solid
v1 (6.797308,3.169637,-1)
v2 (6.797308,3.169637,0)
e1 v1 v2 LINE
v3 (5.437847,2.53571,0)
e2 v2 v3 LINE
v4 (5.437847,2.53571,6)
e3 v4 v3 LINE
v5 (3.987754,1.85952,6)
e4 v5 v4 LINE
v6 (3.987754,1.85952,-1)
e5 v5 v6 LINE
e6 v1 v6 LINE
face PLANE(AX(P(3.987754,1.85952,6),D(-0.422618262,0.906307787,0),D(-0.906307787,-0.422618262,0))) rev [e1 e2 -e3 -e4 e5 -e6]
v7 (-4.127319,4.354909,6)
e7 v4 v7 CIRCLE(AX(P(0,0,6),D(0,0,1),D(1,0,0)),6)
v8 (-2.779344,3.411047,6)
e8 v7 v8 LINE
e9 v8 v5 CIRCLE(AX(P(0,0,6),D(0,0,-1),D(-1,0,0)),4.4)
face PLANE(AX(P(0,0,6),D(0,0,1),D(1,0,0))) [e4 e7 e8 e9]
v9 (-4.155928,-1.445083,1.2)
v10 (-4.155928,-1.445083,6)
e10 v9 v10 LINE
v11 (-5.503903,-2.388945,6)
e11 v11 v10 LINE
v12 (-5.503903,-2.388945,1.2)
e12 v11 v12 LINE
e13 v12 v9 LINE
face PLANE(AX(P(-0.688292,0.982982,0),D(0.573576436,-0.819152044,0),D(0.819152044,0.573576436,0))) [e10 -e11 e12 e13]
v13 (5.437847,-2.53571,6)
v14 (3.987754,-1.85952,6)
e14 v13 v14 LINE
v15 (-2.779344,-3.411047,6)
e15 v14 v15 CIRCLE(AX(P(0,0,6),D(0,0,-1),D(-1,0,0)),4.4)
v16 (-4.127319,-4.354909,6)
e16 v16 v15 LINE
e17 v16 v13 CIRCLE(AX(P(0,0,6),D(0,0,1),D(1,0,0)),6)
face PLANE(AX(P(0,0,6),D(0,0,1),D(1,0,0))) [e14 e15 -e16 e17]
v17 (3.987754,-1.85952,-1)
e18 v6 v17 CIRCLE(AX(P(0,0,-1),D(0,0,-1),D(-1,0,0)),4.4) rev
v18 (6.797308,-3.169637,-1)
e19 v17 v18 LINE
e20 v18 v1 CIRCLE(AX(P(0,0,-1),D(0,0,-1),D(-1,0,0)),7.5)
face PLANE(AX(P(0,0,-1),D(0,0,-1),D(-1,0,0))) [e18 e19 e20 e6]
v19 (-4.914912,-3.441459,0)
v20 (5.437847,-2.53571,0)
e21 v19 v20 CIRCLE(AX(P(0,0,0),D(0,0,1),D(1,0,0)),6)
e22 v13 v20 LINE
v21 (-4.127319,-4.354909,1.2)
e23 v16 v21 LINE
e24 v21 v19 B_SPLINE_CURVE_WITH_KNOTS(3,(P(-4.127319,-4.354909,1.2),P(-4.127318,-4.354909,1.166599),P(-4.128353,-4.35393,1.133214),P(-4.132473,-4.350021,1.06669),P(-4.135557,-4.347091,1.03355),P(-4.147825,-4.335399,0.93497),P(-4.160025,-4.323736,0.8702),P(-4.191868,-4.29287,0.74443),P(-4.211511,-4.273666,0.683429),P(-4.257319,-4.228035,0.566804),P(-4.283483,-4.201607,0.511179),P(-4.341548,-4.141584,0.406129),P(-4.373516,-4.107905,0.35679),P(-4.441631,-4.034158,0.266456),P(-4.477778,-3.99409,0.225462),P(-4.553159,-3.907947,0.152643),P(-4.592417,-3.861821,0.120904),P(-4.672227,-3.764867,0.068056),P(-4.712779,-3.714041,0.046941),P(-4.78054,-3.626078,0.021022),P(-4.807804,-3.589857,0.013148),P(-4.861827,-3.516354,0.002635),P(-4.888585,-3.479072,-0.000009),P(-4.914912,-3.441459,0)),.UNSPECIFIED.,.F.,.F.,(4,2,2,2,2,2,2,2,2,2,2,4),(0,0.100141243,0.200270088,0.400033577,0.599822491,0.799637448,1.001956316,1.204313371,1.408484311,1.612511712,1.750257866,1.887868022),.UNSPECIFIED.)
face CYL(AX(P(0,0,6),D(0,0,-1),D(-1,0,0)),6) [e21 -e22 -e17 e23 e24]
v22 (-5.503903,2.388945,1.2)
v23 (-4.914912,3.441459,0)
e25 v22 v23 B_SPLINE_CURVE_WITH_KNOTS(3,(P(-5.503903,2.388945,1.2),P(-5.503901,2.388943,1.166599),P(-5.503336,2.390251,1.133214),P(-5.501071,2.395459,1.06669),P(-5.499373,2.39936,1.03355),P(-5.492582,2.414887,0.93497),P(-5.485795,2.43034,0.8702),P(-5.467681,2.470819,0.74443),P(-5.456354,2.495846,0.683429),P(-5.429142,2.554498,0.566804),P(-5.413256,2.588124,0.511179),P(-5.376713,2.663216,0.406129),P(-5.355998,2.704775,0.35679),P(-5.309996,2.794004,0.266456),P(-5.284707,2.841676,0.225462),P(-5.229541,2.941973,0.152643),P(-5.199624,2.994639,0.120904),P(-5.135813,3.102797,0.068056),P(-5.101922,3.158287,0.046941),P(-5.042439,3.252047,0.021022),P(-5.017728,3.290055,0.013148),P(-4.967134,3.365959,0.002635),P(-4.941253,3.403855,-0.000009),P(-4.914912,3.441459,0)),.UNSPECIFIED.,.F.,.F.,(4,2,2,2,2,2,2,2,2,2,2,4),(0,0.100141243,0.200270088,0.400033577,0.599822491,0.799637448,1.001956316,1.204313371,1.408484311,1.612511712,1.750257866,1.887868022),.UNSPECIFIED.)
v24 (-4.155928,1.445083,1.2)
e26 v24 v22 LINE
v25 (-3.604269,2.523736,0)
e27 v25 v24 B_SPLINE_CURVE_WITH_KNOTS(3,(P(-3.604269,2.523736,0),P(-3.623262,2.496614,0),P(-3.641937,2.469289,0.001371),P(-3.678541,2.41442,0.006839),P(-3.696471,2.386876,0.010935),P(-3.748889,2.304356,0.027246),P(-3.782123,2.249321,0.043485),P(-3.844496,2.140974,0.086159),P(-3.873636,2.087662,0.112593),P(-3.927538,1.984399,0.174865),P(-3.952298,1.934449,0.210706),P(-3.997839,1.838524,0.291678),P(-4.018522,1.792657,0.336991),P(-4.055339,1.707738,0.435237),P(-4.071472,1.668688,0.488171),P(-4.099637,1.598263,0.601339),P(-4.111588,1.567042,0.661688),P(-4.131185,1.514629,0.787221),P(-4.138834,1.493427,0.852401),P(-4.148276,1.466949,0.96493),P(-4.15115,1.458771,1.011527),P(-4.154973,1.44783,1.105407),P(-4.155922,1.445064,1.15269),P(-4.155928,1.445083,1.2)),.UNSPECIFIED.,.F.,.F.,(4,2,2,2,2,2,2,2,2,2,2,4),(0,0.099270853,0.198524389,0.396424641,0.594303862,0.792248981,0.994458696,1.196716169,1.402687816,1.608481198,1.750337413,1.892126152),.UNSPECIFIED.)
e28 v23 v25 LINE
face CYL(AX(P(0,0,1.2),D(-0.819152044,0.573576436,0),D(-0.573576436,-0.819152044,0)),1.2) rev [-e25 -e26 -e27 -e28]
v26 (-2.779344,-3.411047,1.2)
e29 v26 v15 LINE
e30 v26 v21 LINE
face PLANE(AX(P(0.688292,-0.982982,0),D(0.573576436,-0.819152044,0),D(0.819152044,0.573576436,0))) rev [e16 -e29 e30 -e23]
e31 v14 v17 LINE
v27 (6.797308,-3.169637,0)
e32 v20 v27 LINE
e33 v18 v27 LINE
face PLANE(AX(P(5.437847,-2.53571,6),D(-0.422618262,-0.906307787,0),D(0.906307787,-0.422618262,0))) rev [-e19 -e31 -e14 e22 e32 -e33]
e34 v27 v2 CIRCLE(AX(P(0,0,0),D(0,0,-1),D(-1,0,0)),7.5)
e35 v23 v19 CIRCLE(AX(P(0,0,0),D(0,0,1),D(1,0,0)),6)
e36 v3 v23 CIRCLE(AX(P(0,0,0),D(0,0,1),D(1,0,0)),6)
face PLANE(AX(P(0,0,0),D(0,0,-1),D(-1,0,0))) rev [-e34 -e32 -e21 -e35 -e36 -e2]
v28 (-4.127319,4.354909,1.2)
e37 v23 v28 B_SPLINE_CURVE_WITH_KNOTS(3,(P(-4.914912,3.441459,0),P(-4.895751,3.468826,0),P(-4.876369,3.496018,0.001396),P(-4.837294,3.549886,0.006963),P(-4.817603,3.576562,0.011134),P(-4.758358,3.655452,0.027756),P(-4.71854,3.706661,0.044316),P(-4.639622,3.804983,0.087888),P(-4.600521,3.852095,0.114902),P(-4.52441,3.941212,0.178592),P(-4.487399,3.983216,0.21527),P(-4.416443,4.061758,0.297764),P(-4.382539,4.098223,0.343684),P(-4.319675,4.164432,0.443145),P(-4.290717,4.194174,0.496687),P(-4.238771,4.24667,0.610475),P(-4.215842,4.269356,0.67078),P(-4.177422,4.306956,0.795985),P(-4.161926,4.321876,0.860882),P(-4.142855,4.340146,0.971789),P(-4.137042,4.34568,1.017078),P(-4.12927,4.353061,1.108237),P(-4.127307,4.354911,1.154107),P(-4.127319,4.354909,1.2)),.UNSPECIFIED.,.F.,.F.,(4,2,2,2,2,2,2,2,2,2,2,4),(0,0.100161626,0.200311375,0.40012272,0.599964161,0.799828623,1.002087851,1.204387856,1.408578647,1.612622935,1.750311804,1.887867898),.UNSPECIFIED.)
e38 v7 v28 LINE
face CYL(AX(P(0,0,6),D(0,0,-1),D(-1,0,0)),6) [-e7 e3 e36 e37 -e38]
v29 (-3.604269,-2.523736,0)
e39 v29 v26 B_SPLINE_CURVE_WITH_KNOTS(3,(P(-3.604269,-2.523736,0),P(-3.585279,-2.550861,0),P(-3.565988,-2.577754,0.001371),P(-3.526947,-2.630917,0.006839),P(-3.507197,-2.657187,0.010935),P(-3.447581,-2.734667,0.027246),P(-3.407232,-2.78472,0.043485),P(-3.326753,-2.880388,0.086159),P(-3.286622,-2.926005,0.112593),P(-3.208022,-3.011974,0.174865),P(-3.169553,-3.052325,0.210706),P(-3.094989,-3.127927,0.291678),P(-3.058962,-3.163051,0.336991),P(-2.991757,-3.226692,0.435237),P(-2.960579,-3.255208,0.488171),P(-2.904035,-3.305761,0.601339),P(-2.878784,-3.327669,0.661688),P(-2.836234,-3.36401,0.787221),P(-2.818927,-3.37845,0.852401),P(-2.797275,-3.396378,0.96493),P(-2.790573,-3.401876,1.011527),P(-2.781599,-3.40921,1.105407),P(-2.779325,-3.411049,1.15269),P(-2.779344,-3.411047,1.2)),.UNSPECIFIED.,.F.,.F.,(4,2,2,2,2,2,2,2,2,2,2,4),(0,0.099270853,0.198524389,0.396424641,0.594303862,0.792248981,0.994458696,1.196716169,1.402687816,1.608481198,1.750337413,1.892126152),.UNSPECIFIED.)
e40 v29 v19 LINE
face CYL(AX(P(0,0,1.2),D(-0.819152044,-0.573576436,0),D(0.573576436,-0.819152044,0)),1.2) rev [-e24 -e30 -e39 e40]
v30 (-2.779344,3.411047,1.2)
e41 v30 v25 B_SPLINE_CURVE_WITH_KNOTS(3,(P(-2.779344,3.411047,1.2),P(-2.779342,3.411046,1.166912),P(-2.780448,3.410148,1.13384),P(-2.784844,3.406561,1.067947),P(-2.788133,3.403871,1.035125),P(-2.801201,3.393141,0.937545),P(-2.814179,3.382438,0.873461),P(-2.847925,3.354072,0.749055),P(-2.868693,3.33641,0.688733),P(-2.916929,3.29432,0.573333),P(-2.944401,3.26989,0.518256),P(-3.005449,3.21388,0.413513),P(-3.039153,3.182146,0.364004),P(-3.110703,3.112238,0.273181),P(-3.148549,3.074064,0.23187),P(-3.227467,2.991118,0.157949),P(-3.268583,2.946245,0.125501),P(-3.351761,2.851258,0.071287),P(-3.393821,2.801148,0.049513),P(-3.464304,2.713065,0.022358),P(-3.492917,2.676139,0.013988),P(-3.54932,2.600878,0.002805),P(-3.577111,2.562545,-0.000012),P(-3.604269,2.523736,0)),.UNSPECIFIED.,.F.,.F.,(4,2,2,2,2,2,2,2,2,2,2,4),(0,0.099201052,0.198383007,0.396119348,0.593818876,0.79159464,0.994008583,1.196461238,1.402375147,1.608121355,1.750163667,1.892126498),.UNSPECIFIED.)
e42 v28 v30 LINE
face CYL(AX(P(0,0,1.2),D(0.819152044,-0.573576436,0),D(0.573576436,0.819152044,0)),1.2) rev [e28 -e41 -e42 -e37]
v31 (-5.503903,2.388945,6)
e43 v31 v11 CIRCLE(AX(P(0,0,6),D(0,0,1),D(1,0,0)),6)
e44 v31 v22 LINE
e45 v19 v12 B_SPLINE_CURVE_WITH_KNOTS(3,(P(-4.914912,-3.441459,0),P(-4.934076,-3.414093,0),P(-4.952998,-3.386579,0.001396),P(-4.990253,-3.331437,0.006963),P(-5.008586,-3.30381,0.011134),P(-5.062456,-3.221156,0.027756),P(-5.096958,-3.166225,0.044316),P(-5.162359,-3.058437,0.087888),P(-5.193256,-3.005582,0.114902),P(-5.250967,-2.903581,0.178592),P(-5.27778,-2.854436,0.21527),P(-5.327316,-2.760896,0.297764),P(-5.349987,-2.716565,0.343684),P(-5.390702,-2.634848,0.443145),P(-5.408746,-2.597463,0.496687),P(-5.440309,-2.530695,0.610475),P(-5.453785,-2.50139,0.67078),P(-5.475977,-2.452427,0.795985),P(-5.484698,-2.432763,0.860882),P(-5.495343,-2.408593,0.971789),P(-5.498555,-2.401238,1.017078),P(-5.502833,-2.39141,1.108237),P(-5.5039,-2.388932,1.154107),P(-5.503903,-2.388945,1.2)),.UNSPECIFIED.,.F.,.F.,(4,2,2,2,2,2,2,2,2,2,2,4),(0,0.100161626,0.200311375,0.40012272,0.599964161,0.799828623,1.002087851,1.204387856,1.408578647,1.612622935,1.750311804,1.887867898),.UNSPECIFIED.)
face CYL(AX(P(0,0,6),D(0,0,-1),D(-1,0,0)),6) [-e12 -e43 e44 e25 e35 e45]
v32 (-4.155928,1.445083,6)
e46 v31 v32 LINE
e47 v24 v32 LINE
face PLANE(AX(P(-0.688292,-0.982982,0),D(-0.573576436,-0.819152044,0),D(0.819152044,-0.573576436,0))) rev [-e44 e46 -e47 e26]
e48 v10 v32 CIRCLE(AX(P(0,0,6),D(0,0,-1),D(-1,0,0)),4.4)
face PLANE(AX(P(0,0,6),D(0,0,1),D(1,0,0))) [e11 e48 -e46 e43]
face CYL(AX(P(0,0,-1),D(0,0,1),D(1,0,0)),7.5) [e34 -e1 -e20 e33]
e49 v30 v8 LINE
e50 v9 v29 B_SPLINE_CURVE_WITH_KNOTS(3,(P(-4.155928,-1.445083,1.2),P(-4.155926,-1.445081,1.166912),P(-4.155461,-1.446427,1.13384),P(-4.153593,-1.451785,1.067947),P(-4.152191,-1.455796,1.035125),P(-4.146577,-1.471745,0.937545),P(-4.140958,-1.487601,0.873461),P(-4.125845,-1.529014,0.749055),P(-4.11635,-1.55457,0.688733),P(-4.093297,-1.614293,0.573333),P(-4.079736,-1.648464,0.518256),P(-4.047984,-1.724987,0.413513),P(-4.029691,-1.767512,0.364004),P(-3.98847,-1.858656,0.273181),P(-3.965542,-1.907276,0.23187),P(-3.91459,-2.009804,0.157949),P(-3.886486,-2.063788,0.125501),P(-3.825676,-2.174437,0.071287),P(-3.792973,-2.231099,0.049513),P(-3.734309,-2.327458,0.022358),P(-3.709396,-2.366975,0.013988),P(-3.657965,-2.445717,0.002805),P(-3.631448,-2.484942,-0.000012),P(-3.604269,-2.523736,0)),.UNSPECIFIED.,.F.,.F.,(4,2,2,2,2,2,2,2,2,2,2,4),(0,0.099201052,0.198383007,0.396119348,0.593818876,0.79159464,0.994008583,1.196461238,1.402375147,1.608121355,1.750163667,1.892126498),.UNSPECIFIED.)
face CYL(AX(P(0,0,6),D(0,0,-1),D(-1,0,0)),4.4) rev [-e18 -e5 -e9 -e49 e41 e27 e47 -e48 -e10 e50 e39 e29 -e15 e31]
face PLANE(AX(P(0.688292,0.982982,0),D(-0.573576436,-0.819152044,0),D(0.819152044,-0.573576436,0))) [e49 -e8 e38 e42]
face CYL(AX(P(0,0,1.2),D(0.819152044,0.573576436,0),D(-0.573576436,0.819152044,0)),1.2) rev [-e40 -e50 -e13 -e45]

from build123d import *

# Parameters (mm, degrees)
BOSS_EXTRUDE1_DEPTH = 6
BOSS_EXTRUDE2_START = 1
BOSS_EXTRUDE2_DEPTH = 1
CUT_EXTRUDE1_START  = -6
CUT_EXTRUDE1_DEPTH  = 6
FILLET1_R           = 1.2


with BuildPart() as part:
    # Sketch1 → Boss-Extrude1 (new body)
    with BuildSketch(Plane.XY):
        with BuildLine():
            Line((3.987754263, 1.859520352), (5.437846722, 2.53570957))
            ThreePointArc((5.437846722, 2.53570957), (-6, 0), (5.437846722, -2.53570957))
            Line((5.437846722, -2.53570957), (3.987754263, -1.859520352))
            ThreePointArc((3.987754263, -1.859520352), (-4.4, 0), (3.987754263, 1.859520352))
        make_face()
    extrude(amount=BOSS_EXTRUDE1_DEPTH)

    # Sketch2 → Boss-Extrude2 (add)
    with BuildSketch(Plane(origin=(0, 0, 0), x_dir=(-1, 0, 0), z_dir=(0, 0, -1)).offset(BOSS_EXTRUDE2_START)):
        with BuildLine():
            Line((-3.987754263, -1.859520352), (-5.437846722, -2.53570957))
            ThreePointArc((-5.437846722, -2.53570957), (6, 0), (-5.437846722, 2.53570957))
            Line((-5.437846722, 2.53570957), (-3.987754263, 1.859520352))
            ThreePointArc((-3.987754263, 1.859520352), (4.4, 0), (-3.987754263, -1.859520352))
        make_face()
        with BuildLine():
            Line((-6.797308403, 3.169636963), (-5.437846722, 2.53570957))
            ThreePointArc((-5.437846722, 2.53570957), (6, 0), (-5.437846722, -2.53570957))
            Line((-5.437846722, -2.53570957), (-6.797308403, -3.169636963))
            ThreePointArc((-6.797308403, -3.169636963), (1.623297105, -7.322220053), (7.5, 0))
            ThreePointArc((7.5, 0), (1.623297105, 7.322220053), (-6.797308403, 3.169636963))
        make_face()
    extrude(amount=-BOSS_EXTRUDE2_DEPTH)

    # Sketch3 → Cut-Extrude1 (cut)
    with BuildSketch(Plane.XY.offset(6).offset(CUT_EXTRUDE1_START)):
        with BuildLine():
            ThreePointArc((-5.503902596, -2.388944581), (-4.914912266, -3.441458618), (-4.127319149, -4.354909487))
            Line((-4.127319149, -4.354909487), (-2.779344429, -3.411047427))
            ThreePointArc((-2.779344429, -3.411047427), (-3.604268995, -2.52373632), (-4.155927876, -1.44508252))
            Line((-4.155927876, -1.44508252), (-5.503902596, -2.388944581))
        make_face()
        with BuildLine():
            ThreePointArc((-5.376200178, 5.229385398), (-6.143640332, 4.301823273), (-6.752783625, 3.263420492))
            Line((-6.752783625, 3.263420492), (-5.503902596, 2.388944581))
            ThreePointArc((-5.503902596, 2.388944581), (-4.914912266, 3.441458618), (-4.127319149, 4.354909487))
            Line((-4.127319149, 4.354909487), (-5.376200178, 5.229385398))
        make_face()
        with BuildLine():
            ThreePointArc((-4.127319149, 4.354909487), (-4.914912266, 3.441458618), (-5.503902596, 2.388944581))
            Line((-5.503902596, 2.388944581), (-4.155927876, 1.44508252))
            ThreePointArc((-4.155927876, 1.44508252), (-3.604268995, 2.52373632), (-2.779344429, 3.411047427))
            Line((-2.779344429, 3.411047427), (-4.127319149, 4.354909487))
        make_face()
        with BuildLine():
            ThreePointArc((-6.752783625, -3.263420492), (-6.143640332, -4.301823273), (-5.376200178, -5.229385398))
            Line((-5.376200178, -5.229385398), (-4.127319149, -4.354909487))
            ThreePointArc((-4.127319149, -4.354909487), (-4.914912266, -3.441458618), (-5.503902596, -2.388944581))
            Line((-5.503902596, -2.388944581), (-6.752783625, -3.263420492))
        make_face()
    extrude(amount=CUT_EXTRUDE1_DEPTH, mode=Mode.SUBTRACT)

    # Fillet1
    # the kernel refuses this fillet: 1.2 mm, written as the material it adds along each edge
    with BuildSketch(Plane(origin=(-6.584775282, -6.075638796, 0), x_dir=(-0.5735764363510464, 0.8191520442889915, 0), z_dir=(0.8191520442889916, 0.5735764363510465, 0))) as fillet1_piece_1_section:
        with BuildLine():
            CenterArc((FILLET1_R, FILLET1_R), FILLET1_R, 180, 90)
            Line((0, FILLET1_R), (0, 0))
            Line((0, 0), (FILLET1_R, 0))
        make_face()
    fillet1_piece_1 = extrude(amount=7.645573285, mode=Mode.PRIVATE)
    fillet1_piece_1 = fillet1_piece_1 - Plane(origin=(0, 0, 0.272987172), x_dir=(0.9063077870366507, 0.4226182617406977, 0), z_dir=(0, 0, -1)) * Cylinder(4.4, 21, mode=Mode.PRIVATE)
    fillet1_piece_1 = fillet1_piece_1 & Plane(origin=(0, 0, 0.272987172), x_dir=(0.9063077870366507, 0.4226182617406977, 0), z_dir=(0, 0, -1)) * Cylinder(6, 21, mode=Mode.PRIVATE)
    add(fillet1_piece_1)
    with BuildSketch(Plane(origin=(-1.698471743, 0.275646789, 0), x_dir=(0.5735764363510474, -0.8191520442889908, 0), z_dir=(-0.819152044288991, -0.5735764363510474, 0))) as fillet1_piece_2_section:
        with BuildLine():
            CenterArc((FILLET1_R, FILLET1_R), FILLET1_R, 180, 90)
            Line((0, FILLET1_R), (0, 0))
            Line((0, 0), (FILLET1_R, 0))
        make_face()
    fillet1_piece_2 = extrude(amount=7.645573285, mode=Mode.PRIVATE)
    fillet1_piece_2 = fillet1_piece_2 - Plane(origin=(0, 0, 0.272986937), x_dir=(0.9063077870366507, 0.4226182617406977, 0), z_dir=(0, 0, -1)) * Cylinder(4.4, 21, mode=Mode.PRIVATE)
    fillet1_piece_2 = fillet1_piece_2 & Plane(origin=(0, 0, 0.272986937), x_dir=(0.9063077870366507, 0.4226182617406977, 0), z_dir=(0, 0, -1)) * Cylinder(6, 21, mode=Mode.PRIVATE)
    add(fillet1_piece_2)
    with BuildSketch(Plane(origin=(-0.321888296, 1.690318118, 0), x_dir=(0, 0, 1), z_dir=(-0.8191520442889906, 0.5735764363510478, 0))) as fillet1_piece_3_section:
        with BuildLine():
            CenterArc((FILLET1_R, -FILLET1_R), FILLET1_R, 90, 90)
            Line((0, -FILLET1_R), (0, 0))
            Line((0, 0), (FILLET1_R, 0))
        make_face()
    fillet1_piece_3 = extrude(amount=7.645573285, mode=Mode.PRIVATE)
    fillet1_piece_3 = fillet1_piece_3 - Plane(origin=(0, 0, 0.272987798), x_dir=(0.9063077870366507, -0.4226182617406978, 0), z_dir=(0, 0, -1)) * Cylinder(4.4, 21, mode=Mode.PRIVATE)
    fillet1_piece_3 = fillet1_piece_3 & Plane(origin=(0, 0, 0.272987798), x_dir=(0.9063077870366507, 0.4226182617406977, 0), z_dir=(0, 0, -1)) * Cylinder(6, 21, mode=Mode.PRIVATE)
    add(fillet1_piece_3)
    with BuildSketch(Plane(origin=(-1.698471743, -0.275646789, 0), x_dir=(0.5735764363510463, 0.8191520442889917, 0), z_dir=(-0.8191520442889917, 0.5735764363510463, 0))) as fillet1_piece_4_section:
        with BuildLine():
            CenterArc((FILLET1_R, -FILLET1_R), FILLET1_R, 90, 90)
            Line((0, -FILLET1_R), (0, 0))
            Line((0, 0), (FILLET1_R, 0))
        make_face()
    fillet1_piece_4 = extrude(amount=7.645573285, mode=Mode.PRIVATE)
    fillet1_piece_4 = fillet1_piece_4 - Plane(origin=(0, 0, 0.27298714), x_dir=(0.9063077870366507, 0.4226182617406977, 0), z_dir=(0, 0, -1)) * Cylinder(4.4, 21, mode=Mode.PRIVATE)
    fillet1_piece_4 = fillet1_piece_4 & Plane(origin=(0, 0, 0.27298714), x_dir=(0.9063077870366507, 0.4226182617406977, 0), z_dir=(0, 0, -1)) * Cylinder(6, 21, mode=Mode.PRIVATE)
    add(fillet1_piece_4)


solid = part.part
